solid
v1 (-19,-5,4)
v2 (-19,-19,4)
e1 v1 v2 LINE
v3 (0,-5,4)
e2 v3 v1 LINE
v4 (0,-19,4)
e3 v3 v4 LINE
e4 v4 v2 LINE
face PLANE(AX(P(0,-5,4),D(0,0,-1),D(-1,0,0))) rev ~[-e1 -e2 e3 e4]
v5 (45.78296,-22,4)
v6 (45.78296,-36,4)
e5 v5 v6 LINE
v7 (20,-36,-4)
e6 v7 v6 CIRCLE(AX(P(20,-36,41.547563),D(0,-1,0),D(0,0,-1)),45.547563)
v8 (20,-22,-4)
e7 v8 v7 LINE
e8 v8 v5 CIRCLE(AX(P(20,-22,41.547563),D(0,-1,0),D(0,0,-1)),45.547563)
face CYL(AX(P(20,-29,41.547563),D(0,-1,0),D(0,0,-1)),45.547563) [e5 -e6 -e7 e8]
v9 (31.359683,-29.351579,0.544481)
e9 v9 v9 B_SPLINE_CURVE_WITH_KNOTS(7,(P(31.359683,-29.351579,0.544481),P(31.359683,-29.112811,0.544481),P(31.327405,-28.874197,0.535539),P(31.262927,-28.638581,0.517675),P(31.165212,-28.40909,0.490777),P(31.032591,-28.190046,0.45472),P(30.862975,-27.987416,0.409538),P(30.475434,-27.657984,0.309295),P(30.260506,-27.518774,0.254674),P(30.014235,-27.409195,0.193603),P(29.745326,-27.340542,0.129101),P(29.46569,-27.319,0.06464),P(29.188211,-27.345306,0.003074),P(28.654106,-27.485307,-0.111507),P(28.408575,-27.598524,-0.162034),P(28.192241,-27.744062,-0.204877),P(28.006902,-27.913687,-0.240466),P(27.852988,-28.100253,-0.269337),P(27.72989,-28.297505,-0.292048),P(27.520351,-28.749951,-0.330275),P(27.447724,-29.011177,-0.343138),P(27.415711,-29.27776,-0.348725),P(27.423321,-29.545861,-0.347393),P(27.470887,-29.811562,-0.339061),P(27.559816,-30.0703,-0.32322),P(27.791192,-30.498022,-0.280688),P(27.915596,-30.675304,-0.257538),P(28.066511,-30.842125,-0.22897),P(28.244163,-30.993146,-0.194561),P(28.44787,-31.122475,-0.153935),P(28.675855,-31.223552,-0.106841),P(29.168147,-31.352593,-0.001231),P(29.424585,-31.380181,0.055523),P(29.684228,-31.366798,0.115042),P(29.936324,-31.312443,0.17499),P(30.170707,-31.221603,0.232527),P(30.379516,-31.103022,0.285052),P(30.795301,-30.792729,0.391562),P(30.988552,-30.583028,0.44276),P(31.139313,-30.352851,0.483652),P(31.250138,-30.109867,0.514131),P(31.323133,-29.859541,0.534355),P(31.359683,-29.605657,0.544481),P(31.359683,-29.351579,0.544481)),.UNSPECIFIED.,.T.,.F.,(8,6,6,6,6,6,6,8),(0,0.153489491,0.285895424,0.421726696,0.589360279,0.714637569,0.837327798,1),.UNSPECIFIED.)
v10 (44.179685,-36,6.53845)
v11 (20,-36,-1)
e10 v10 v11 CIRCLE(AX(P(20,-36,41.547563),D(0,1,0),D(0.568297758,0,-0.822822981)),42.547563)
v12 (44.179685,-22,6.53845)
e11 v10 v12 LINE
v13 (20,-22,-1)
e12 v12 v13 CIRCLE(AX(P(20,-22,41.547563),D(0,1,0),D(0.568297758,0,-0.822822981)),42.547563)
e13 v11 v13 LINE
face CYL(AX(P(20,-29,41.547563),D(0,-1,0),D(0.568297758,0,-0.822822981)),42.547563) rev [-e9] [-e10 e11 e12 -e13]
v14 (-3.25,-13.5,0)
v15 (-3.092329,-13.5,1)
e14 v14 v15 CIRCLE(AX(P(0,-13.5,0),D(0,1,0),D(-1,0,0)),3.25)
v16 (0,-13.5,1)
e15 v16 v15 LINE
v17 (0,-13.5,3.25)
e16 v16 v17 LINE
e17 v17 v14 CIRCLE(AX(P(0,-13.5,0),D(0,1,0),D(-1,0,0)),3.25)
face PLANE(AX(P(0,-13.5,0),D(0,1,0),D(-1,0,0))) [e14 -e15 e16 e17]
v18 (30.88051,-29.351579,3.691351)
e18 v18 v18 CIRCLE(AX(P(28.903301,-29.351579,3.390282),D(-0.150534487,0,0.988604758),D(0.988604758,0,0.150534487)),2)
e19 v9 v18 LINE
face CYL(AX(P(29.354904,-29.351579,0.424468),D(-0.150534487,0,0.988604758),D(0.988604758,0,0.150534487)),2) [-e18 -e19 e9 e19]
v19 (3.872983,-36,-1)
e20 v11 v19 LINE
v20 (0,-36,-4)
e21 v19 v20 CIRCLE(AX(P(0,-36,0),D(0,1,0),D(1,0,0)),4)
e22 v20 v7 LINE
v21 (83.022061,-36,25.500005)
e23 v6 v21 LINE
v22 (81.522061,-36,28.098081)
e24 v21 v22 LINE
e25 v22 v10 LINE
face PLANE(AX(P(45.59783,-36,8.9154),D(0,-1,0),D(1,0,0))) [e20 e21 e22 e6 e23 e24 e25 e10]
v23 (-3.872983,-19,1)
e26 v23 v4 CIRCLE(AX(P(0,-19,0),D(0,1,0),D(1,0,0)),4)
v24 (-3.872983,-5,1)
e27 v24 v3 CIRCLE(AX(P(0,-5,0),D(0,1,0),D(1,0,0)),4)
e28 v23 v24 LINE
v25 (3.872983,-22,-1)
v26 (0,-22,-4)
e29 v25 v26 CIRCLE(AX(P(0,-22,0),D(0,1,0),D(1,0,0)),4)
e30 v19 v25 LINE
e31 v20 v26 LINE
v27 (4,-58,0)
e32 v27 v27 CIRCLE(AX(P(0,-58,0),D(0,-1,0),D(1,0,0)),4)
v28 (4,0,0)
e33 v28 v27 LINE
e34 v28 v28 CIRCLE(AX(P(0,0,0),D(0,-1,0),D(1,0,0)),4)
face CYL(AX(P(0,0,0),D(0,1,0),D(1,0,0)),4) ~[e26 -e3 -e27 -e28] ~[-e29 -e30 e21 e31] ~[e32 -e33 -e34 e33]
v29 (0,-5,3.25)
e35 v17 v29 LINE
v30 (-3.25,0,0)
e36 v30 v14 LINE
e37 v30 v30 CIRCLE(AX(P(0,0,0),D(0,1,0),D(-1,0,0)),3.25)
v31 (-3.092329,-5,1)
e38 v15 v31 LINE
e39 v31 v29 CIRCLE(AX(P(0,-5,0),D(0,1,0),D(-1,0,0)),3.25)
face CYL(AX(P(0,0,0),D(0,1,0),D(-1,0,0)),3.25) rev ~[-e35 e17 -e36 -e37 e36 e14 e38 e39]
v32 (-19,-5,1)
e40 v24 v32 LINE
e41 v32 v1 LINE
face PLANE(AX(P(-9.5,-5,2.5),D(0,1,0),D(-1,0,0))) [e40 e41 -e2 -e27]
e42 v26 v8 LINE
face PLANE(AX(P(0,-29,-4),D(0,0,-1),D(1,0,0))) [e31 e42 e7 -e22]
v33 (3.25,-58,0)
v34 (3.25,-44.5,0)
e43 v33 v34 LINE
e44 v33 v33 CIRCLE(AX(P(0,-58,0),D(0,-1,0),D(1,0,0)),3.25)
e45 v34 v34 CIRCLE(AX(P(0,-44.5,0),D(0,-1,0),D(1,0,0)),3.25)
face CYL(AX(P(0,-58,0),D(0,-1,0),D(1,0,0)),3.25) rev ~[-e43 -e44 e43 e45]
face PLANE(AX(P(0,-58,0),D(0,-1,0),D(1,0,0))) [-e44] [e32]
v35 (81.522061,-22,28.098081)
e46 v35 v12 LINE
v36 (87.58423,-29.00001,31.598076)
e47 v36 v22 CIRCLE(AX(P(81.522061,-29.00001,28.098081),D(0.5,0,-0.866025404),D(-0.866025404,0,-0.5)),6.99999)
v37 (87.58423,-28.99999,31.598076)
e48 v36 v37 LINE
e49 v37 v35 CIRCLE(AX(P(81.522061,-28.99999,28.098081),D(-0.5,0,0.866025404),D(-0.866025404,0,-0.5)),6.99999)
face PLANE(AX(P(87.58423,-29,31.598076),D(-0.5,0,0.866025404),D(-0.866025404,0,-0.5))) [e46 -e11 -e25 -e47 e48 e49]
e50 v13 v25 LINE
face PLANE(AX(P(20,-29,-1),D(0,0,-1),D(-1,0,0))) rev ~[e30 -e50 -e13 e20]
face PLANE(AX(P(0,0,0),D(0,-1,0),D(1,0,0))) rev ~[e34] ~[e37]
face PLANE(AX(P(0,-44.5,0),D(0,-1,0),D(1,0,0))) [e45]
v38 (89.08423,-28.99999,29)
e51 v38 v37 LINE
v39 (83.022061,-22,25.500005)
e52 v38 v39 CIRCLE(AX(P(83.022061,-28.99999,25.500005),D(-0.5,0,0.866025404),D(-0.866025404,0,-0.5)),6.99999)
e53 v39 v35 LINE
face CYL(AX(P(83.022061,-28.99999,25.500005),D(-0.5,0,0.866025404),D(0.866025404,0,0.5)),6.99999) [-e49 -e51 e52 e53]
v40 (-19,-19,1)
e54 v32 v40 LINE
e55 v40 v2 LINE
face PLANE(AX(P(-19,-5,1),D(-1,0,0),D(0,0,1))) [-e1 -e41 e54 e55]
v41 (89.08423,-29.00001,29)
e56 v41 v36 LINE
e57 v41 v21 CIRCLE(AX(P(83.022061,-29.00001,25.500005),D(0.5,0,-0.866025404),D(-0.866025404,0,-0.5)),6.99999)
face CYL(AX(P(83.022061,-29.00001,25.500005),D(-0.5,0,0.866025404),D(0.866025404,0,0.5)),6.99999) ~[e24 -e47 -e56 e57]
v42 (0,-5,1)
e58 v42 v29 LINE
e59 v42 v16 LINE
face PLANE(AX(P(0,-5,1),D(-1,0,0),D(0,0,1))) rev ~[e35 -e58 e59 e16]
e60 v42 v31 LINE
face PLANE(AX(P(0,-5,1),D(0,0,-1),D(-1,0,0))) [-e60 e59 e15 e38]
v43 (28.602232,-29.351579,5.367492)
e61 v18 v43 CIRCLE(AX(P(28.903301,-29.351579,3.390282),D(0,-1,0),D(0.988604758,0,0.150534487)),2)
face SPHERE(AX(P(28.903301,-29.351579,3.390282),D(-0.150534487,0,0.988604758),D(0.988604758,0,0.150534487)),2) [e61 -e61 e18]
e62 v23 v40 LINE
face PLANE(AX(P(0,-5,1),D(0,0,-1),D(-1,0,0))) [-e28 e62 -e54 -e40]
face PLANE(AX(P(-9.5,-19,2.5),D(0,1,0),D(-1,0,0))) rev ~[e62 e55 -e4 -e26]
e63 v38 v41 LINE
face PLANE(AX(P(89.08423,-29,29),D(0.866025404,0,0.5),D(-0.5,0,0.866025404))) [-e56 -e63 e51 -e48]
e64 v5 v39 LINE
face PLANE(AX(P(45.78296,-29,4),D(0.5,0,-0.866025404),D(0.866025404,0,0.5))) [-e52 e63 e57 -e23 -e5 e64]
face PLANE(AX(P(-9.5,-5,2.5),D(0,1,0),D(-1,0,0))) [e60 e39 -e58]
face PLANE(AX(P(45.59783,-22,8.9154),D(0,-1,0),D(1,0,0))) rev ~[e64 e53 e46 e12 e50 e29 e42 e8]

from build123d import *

# Parameters (mm, degrees)
F0_R           = 4
F1_DEPTH       = 58
F2_R           = 3.25
F3_DEPTH       = 13.5
F4_R           = 3.25
F5_DEPTH       = 13.5
F8_DEPTH       = 7
F8_DEPTH_BACK  = 7
F9_R           = 6.99999
F11_W          = 19
F11_H          = 3
F12_DEPTH      = 14
F17_R          = 2
F18_DEPTH      = 5
F18_DEPTH_BACK = 0.471687069
F19_R          = 2


# Not quite as in the source:
# - a fillet or chamfer is up to 0.001 mm smaller than in the source, because OpenCascade refuses the exact size


with BuildPart() as f1:
    # F0 (on Front) → F1 (new body)
    with BuildSketch(Plane.XZ):
        Circle(F0_R)
    extrude(amount=F1_DEPTH)

    # F2 (on face) → F3 (cut)
    with BuildSketch(Plane.XZ.offset(58)):
        Circle(F2_R)
    extrude(amount=-F3_DEPTH, mode=Mode.SUBTRACT)

    # F4 (on face) → F5 (cut)
    with BuildSketch(Plane(origin=(0, 0, 0), x_dir=(-1, 0, 0), z_dir=(0, 1, 0))):
        Circle(F4_R)
    extrude(amount=-F5_DEPTH, mode=Mode.SUBTRACT)

    # F7 (on offset) → F8 (join, two sides)
    with BuildSketch(Plane.XZ.offset(29)) as f8_sk:
        with BuildLine():
            Line((0, -1), (0, -4))
            Line((0, -4), (20, -4))
            ThreePointArc((20, -4), (33.4977869164, -1.9540489613), (45.7829596161, 4))
            Line((45.7829596161, 4), (89.0842298053, 29))
            Line((89.0842298053, 29), (87.5842298053, 31.5980762114))
            Line((87.5842298053, 31.5980762114), (44.1796846254, 6.5384503677))
            ThreePointArc((44.1796846254, 6.5384503677), (32.6637808585, 0.9283092986), (20, -1))
            Line((20, -1), (0, -1))
        make_face()
    extrude(amount=F8_DEPTH)
    extrude(f8_sk.sketch, amount=-F8_DEPTH_BACK)

    # F9 (radius 7 in the source; OpenCascade refuses exactly that, so slightly less here)
    f9_edges = [f1.edges().sort_by_distance(p)[0] for p in [
        (88.33423, -36, 30.299038),
        (88.33423, -22, 30.299038),
    ]]
    fillet(f9_edges, radius=F9_R)

    # F11 (on offset) → F12 (join)
    with BuildSketch(Plane(origin=(0, -5, 0), x_dir=(-1, 0, 0), z_dir=(0, 1, 0))):
        with Locations((9.5, 2.5)):
            Rectangle(F11_W, F11_H)
    extrude(amount=-F12_DEPTH)

    # F17 (on 3pt) → F18 (join, two sides)
    with BuildSketch(Plane(origin=(0.602031742, 0, -3.953721561), x_dir=(0.9886047584, 0, 0.1505344865), z_dir=(-0.1505344865, 0, 0.9886047584))) as f18_sk:
        with Locations((29.0842950344, -29.3515790254)):
            Circle(F17_R)
    extrude(amount=F18_DEPTH)
    extrude(f18_sk.sketch, amount=-F18_DEPTH_BACK)

    # F19
    f19_edges = [f1.edges().sort_by_distance(p)[0] for p in [
        (26.625022, -29.351579, 5.066423),
    ]]
    fillet(f19_edges, radius=F19_R)


solid = f1.part
